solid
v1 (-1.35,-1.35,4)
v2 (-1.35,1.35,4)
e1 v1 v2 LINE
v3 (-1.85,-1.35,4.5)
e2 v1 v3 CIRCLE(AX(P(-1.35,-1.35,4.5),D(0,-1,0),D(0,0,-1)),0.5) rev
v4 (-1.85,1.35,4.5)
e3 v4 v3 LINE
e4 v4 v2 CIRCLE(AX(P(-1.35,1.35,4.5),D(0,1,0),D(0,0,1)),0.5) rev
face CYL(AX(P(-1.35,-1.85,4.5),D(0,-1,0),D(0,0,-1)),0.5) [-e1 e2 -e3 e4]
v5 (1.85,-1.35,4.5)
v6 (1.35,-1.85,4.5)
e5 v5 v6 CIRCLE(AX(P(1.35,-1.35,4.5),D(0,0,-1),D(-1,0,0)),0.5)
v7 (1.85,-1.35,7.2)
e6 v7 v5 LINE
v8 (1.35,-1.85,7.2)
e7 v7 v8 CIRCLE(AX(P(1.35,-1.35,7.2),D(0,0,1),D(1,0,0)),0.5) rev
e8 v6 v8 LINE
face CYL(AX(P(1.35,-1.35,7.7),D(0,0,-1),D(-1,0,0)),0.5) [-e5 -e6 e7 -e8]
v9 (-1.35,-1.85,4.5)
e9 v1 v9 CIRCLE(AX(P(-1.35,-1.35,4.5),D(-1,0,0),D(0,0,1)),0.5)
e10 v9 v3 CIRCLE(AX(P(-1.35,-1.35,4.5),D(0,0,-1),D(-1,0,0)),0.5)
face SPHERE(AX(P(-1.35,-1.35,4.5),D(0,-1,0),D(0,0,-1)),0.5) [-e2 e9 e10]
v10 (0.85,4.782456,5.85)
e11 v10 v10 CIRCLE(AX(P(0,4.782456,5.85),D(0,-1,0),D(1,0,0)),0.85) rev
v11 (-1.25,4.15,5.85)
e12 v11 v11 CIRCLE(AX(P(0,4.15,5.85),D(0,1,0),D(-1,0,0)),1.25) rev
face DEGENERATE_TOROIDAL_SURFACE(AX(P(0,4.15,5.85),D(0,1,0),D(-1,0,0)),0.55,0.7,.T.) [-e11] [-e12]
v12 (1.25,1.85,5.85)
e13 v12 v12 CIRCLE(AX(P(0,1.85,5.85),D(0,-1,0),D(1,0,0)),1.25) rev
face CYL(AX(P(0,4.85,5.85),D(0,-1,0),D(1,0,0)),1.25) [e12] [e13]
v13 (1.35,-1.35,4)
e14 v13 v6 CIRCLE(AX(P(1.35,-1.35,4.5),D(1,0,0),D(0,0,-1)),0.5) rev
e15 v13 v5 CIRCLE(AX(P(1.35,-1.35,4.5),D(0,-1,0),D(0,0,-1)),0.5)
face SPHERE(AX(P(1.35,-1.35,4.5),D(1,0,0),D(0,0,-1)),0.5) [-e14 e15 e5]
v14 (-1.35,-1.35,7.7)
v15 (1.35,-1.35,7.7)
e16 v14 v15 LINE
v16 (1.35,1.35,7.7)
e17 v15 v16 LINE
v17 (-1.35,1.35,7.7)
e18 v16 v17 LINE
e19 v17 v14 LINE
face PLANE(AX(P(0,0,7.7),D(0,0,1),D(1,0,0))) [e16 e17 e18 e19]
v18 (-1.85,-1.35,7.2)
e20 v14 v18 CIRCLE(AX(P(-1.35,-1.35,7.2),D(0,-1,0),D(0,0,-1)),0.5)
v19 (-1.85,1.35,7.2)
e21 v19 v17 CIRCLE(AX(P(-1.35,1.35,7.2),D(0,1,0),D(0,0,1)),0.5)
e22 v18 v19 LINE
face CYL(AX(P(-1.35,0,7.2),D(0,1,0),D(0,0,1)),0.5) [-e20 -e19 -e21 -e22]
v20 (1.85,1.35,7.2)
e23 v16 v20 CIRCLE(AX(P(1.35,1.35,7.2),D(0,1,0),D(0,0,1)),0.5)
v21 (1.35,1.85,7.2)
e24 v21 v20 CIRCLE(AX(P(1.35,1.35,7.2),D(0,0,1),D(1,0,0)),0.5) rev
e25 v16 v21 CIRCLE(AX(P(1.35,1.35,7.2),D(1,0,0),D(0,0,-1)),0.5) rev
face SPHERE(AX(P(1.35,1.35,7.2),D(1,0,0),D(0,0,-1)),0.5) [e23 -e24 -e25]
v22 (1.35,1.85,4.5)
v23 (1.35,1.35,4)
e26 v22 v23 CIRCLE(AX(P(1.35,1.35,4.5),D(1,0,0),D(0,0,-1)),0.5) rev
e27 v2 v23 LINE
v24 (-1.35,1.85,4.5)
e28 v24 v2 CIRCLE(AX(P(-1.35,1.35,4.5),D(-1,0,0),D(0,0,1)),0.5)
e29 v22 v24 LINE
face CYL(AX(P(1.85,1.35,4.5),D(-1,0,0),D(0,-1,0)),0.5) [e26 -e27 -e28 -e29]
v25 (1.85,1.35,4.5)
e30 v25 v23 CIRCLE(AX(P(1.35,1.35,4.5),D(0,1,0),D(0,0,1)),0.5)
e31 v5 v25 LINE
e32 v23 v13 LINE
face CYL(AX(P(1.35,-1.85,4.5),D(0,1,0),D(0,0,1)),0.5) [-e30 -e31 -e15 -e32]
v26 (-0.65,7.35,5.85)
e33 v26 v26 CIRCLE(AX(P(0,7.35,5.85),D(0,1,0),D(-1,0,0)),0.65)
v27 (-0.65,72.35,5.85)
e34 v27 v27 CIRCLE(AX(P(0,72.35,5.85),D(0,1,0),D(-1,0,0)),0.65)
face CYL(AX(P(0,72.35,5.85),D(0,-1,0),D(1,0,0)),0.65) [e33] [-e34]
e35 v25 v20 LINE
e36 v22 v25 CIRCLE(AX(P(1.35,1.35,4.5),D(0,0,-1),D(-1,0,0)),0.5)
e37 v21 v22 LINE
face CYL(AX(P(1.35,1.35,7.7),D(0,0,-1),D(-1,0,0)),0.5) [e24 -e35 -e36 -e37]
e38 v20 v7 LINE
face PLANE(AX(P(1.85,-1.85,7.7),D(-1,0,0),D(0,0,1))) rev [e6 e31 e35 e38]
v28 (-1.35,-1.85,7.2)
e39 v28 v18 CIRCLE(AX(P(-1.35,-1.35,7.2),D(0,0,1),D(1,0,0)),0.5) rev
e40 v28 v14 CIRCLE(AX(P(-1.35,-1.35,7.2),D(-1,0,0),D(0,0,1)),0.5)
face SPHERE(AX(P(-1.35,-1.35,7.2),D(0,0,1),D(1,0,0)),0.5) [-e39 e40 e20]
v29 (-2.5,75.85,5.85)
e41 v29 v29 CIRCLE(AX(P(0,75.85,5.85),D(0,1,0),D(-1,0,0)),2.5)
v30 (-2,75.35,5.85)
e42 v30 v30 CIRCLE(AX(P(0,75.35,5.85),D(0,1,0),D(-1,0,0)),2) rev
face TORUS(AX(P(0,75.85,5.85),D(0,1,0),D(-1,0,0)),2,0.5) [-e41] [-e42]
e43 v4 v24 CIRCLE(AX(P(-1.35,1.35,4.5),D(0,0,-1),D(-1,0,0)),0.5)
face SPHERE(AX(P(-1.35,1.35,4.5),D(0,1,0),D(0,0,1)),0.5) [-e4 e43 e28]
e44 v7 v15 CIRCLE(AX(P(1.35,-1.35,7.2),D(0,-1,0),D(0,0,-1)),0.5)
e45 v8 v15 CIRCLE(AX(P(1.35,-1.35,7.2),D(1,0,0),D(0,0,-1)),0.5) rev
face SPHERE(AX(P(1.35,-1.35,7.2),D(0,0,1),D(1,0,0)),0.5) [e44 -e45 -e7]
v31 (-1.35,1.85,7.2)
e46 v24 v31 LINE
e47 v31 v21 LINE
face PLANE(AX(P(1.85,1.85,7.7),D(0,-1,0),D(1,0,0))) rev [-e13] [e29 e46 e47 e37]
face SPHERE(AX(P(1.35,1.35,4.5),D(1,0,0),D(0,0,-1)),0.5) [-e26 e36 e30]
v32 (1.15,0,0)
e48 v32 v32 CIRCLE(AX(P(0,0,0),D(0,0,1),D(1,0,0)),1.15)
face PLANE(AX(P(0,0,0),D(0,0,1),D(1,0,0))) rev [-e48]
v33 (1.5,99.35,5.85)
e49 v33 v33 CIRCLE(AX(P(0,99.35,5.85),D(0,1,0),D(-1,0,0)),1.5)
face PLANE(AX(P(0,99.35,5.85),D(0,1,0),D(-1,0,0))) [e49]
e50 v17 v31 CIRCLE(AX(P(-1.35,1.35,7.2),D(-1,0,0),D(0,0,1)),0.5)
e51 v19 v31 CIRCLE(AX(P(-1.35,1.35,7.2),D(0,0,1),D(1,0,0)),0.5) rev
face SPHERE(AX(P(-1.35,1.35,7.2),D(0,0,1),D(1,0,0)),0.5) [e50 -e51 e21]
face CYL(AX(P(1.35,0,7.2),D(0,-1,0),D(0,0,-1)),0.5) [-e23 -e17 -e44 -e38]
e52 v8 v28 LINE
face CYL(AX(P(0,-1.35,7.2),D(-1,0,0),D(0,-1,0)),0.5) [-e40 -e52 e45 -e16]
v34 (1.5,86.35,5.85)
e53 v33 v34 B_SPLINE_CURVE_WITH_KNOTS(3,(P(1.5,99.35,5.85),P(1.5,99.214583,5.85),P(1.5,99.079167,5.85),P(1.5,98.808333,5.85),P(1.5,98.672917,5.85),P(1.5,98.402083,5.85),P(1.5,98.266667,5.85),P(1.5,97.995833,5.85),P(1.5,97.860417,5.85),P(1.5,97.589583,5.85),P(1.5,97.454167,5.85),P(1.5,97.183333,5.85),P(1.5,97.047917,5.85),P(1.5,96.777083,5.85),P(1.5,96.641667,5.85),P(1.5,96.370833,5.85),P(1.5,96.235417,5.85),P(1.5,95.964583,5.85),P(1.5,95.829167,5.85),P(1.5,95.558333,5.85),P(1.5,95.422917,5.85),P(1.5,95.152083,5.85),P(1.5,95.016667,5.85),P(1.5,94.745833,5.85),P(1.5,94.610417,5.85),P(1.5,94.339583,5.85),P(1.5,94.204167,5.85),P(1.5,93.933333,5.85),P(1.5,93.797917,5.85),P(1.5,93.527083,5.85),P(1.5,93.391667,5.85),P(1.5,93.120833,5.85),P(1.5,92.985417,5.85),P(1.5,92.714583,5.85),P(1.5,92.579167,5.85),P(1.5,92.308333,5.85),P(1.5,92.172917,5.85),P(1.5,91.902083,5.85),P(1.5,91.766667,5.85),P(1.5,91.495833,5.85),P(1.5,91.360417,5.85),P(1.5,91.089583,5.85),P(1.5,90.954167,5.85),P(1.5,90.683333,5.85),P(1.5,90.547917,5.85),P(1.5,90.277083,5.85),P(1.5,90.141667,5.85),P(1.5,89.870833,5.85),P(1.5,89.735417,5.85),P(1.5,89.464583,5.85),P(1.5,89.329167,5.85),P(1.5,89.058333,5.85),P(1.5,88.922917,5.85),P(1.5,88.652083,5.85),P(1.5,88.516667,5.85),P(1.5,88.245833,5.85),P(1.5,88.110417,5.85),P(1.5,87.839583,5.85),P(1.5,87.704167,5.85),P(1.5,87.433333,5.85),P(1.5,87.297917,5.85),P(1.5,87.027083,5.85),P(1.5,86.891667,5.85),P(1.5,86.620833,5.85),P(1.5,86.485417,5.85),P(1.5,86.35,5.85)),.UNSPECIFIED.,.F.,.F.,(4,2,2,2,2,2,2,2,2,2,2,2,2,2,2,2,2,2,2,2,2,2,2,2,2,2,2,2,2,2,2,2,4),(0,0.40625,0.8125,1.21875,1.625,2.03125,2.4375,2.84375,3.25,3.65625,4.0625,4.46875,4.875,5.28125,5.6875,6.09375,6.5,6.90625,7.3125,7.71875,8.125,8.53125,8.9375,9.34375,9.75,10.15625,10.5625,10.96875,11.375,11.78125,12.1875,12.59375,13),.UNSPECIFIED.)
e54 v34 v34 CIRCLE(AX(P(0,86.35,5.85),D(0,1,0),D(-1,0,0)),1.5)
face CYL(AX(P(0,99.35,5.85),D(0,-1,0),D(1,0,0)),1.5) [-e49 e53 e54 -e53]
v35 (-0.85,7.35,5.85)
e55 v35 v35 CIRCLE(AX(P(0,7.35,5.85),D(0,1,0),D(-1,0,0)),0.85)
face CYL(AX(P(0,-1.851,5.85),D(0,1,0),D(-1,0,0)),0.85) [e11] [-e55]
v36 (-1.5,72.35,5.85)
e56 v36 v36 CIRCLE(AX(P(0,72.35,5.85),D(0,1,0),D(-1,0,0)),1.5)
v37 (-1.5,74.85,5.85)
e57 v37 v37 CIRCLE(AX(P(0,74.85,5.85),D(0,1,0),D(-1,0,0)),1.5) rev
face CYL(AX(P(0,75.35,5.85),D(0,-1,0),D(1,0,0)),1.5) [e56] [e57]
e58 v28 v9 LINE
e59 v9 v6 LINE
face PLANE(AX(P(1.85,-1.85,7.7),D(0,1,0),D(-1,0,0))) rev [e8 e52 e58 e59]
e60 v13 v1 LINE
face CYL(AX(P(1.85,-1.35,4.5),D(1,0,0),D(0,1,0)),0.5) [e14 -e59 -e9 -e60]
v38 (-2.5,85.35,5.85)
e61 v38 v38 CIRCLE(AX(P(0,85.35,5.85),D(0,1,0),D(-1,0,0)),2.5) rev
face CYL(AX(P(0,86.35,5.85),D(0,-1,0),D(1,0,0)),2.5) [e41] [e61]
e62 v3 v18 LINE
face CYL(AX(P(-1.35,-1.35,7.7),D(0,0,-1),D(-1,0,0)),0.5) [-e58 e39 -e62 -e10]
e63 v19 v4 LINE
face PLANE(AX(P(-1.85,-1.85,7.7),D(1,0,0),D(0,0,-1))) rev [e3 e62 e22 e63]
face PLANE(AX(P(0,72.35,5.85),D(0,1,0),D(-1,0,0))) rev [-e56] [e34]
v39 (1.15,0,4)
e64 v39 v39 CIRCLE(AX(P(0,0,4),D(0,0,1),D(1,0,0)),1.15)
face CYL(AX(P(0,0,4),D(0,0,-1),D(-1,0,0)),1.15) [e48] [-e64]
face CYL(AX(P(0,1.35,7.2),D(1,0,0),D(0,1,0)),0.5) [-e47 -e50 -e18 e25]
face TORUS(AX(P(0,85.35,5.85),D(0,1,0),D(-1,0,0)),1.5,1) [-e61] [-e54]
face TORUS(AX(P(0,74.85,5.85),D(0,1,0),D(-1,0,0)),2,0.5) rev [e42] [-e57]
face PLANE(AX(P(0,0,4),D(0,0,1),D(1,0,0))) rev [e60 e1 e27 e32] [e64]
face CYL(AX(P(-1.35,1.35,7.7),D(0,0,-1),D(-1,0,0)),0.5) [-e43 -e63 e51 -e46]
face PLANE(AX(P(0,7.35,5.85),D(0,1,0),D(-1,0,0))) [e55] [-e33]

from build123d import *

# Parameters (mm, degrees)
SKETCH1_R                       = 1.15
BOSS_EXTRUDE1_DEPTH             = 4
SKETCH2_W                       = 3.7
SKETCH2_H                       = 3.7
BOSS_EXTRUDE2_DEPTH             = 3.7
FILLET1_R                       = 0.5
SKETCH3_R                       = 1.25
BOSS_EXTRUDE3_DEPTH             = 3
FILLET2_R                       = 0.7
SKETCH4_R                       = 0.85
BOSS_EXTRUDE4_DEPTH             = 2.5
BOSS_EXTRUDE4_DIRECTION_2_REACH = 12.373
SKETCH5_R                       = 0.65
BOSS_EXTRUDE5_DEPTH             = 65
SKETCH6_R                       = 1.5
BOSS_EXTRUDE6_DEPTH             = 3
SKETCH7_R                       = 2.5
BOSS_EXTRUDE7_DEPTH             = 11
SKETCH8_R                       = 1.5
BOSS_EXTRUDE8_DEPTH             = 13
FILLET3_R                       = 1
FILLET4_R                       = 0.5
FILLET5_R                       = 0.5


with BuildPart() as part:
    # Sketch1 → Boss-Extrude1 (new body)
    with BuildSketch(Plane.XY):
        Circle(SKETCH1_R)
    extrude(amount=BOSS_EXTRUDE1_DEPTH)

    # Sketch2 → Boss-Extrude2 (add)
    with BuildSketch(Plane.XY.offset(4)):
        Rectangle(SKETCH2_W, SKETCH2_H)
    extrude(amount=BOSS_EXTRUDE2_DEPTH)

    # Fillet1
    fillet1_edges = [part.edges().sort_by_distance(p)[0] for p in [
        (-1.85, 0, 4),
        (-1.85, 1.85, 5.85),
        (0, -1.85, 4),
        (-1.85, -1.85, 5.85),
        (1.85, 0, 4),
        (1.85, -1.85, 5.85),
        (0, 1.85, 4),
        (1.85, 1.85, 5.85),
        (-1.85, 0, 7.7),
        (0, -1.85, 7.7),
        (1.85, 0, 7.7),
        (0, 1.85, 7.7),
    ]]
    fillet(fillet1_edges, radius=FILLET1_R)

    # Sketch3 → Boss-Extrude3 (add)
    with BuildSketch(Plane(origin=(0, 1.85, 0), x_dir=(1, 0, 0), z_dir=(0, 1, 0))):
        with Locations((0, -5.85)):
            Circle(SKETCH3_R)
    extrude(amount=BOSS_EXTRUDE3_DEPTH)

    # Fillet2
    fillet2_edges = [part.edges().sort_by_distance(p)[0] for p in [
        (-1.25, 4.85, 5.85),
    ]]
    fillet(fillet2_edges, radius=FILLET2_R)

    # Sketch4 → Boss-Extrude4 (add)
    with BuildSketch(Plane(origin=(0, 4.85, 0), x_dir=(1, 0, 0), z_dir=(0, 1, 0))):
        with Locations(Location((0, -5.85, 0), (0, 0, 180))):
            Circle(SKETCH4_R)
    extrude(amount=BOSS_EXTRUDE4_DEPTH)

    # Sketch4 → Boss-Extrude4 direction 2 (add, up to next)
    with BuildSketch(Plane(origin=(0, 4.85, 0), x_dir=(1, 0, 0), z_dir=(0, 1, 0)), mode=Mode.PRIVATE) as boss_extrude4_direction_2_sk1:
        with Locations(Location((0, -5.85, 0), (0, 0, 180))):
            Circle(SKETCH4_R)
    boss_extrude4_direction_2_tool1 = extrude(boss_extrude4_direction_2_sk1.sketch, amount=-BOSS_EXTRUDE4_DIRECTION_2_REACH, mode=Mode.PRIVATE) - part.part
    add(boss_extrude4_direction_2_tool1.solids().sort_by_distance((0, 4.85, 5.85))[0])

    # Sketch5 → Boss-Extrude5 (add)
    with BuildSketch(Plane(origin=(0, 7.35, 0), x_dir=(1, 0, 0), z_dir=(0, 1, 0))):
        with Locations(Location((0, -5.85, 0), (0, 0, 180))):
            Circle(SKETCH5_R)
    extrude(amount=BOSS_EXTRUDE5_DEPTH)

    # Sketch6 → Boss-Extrude6 (add)
    with BuildSketch(Plane(origin=(0, 72.35, 0), x_dir=(1, 0, 0), z_dir=(0, 1, 0))):
        with Locations(Location((0, -5.85, 0), (0, 0, 180))):
            Circle(SKETCH6_R)
    extrude(amount=BOSS_EXTRUDE6_DEPTH)

    # Sketch7 → Boss-Extrude7 (add)
    with BuildSketch(Plane(origin=(0, 75.35, 0), x_dir=(1, 0, 0), z_dir=(0, 1, 0))):
        with Locations(Location((0, -5.85, 0), (0, 0, 180))):
            Circle(SKETCH7_R)
    extrude(amount=BOSS_EXTRUDE7_DEPTH)

    # Sketch8 → Boss-Extrude8 (add)
    with BuildSketch(Plane(origin=(0, 86.35, 0), x_dir=(1, 0, 0), z_dir=(0, 1, 0))):
        with Locations(Location((0, -5.85, 0), (0, 0, 180))):
            Circle(SKETCH8_R)
    extrude(amount=BOSS_EXTRUDE8_DEPTH)

    # Fillet3
    fillet3_edges = [part.edges().sort_by_distance(p)[0] for p in [
        (2.5, 86.35, 5.85),
    ]]
    fillet(fillet3_edges, radius=FILLET3_R - 0.0001)  # a hair under: the kernel refuses the full size

    # Fillet4
    fillet4_edges = [part.edges().sort_by_distance(p)[0] for p in [
        (2.5, 75.35, 5.85),
    ]]
    fillet(fillet4_edges, radius=FILLET4_R)

    # Fillet5
    fillet5_edges = [part.edges().sort_by_distance(p)[0] for p in [
        (1.5, 75.35, 5.85),
    ]]
    fillet(fillet5_edges, radius=FILLET5_R - 0.0001)  # a hair under: the kernel refuses the full size


solid = part.part
